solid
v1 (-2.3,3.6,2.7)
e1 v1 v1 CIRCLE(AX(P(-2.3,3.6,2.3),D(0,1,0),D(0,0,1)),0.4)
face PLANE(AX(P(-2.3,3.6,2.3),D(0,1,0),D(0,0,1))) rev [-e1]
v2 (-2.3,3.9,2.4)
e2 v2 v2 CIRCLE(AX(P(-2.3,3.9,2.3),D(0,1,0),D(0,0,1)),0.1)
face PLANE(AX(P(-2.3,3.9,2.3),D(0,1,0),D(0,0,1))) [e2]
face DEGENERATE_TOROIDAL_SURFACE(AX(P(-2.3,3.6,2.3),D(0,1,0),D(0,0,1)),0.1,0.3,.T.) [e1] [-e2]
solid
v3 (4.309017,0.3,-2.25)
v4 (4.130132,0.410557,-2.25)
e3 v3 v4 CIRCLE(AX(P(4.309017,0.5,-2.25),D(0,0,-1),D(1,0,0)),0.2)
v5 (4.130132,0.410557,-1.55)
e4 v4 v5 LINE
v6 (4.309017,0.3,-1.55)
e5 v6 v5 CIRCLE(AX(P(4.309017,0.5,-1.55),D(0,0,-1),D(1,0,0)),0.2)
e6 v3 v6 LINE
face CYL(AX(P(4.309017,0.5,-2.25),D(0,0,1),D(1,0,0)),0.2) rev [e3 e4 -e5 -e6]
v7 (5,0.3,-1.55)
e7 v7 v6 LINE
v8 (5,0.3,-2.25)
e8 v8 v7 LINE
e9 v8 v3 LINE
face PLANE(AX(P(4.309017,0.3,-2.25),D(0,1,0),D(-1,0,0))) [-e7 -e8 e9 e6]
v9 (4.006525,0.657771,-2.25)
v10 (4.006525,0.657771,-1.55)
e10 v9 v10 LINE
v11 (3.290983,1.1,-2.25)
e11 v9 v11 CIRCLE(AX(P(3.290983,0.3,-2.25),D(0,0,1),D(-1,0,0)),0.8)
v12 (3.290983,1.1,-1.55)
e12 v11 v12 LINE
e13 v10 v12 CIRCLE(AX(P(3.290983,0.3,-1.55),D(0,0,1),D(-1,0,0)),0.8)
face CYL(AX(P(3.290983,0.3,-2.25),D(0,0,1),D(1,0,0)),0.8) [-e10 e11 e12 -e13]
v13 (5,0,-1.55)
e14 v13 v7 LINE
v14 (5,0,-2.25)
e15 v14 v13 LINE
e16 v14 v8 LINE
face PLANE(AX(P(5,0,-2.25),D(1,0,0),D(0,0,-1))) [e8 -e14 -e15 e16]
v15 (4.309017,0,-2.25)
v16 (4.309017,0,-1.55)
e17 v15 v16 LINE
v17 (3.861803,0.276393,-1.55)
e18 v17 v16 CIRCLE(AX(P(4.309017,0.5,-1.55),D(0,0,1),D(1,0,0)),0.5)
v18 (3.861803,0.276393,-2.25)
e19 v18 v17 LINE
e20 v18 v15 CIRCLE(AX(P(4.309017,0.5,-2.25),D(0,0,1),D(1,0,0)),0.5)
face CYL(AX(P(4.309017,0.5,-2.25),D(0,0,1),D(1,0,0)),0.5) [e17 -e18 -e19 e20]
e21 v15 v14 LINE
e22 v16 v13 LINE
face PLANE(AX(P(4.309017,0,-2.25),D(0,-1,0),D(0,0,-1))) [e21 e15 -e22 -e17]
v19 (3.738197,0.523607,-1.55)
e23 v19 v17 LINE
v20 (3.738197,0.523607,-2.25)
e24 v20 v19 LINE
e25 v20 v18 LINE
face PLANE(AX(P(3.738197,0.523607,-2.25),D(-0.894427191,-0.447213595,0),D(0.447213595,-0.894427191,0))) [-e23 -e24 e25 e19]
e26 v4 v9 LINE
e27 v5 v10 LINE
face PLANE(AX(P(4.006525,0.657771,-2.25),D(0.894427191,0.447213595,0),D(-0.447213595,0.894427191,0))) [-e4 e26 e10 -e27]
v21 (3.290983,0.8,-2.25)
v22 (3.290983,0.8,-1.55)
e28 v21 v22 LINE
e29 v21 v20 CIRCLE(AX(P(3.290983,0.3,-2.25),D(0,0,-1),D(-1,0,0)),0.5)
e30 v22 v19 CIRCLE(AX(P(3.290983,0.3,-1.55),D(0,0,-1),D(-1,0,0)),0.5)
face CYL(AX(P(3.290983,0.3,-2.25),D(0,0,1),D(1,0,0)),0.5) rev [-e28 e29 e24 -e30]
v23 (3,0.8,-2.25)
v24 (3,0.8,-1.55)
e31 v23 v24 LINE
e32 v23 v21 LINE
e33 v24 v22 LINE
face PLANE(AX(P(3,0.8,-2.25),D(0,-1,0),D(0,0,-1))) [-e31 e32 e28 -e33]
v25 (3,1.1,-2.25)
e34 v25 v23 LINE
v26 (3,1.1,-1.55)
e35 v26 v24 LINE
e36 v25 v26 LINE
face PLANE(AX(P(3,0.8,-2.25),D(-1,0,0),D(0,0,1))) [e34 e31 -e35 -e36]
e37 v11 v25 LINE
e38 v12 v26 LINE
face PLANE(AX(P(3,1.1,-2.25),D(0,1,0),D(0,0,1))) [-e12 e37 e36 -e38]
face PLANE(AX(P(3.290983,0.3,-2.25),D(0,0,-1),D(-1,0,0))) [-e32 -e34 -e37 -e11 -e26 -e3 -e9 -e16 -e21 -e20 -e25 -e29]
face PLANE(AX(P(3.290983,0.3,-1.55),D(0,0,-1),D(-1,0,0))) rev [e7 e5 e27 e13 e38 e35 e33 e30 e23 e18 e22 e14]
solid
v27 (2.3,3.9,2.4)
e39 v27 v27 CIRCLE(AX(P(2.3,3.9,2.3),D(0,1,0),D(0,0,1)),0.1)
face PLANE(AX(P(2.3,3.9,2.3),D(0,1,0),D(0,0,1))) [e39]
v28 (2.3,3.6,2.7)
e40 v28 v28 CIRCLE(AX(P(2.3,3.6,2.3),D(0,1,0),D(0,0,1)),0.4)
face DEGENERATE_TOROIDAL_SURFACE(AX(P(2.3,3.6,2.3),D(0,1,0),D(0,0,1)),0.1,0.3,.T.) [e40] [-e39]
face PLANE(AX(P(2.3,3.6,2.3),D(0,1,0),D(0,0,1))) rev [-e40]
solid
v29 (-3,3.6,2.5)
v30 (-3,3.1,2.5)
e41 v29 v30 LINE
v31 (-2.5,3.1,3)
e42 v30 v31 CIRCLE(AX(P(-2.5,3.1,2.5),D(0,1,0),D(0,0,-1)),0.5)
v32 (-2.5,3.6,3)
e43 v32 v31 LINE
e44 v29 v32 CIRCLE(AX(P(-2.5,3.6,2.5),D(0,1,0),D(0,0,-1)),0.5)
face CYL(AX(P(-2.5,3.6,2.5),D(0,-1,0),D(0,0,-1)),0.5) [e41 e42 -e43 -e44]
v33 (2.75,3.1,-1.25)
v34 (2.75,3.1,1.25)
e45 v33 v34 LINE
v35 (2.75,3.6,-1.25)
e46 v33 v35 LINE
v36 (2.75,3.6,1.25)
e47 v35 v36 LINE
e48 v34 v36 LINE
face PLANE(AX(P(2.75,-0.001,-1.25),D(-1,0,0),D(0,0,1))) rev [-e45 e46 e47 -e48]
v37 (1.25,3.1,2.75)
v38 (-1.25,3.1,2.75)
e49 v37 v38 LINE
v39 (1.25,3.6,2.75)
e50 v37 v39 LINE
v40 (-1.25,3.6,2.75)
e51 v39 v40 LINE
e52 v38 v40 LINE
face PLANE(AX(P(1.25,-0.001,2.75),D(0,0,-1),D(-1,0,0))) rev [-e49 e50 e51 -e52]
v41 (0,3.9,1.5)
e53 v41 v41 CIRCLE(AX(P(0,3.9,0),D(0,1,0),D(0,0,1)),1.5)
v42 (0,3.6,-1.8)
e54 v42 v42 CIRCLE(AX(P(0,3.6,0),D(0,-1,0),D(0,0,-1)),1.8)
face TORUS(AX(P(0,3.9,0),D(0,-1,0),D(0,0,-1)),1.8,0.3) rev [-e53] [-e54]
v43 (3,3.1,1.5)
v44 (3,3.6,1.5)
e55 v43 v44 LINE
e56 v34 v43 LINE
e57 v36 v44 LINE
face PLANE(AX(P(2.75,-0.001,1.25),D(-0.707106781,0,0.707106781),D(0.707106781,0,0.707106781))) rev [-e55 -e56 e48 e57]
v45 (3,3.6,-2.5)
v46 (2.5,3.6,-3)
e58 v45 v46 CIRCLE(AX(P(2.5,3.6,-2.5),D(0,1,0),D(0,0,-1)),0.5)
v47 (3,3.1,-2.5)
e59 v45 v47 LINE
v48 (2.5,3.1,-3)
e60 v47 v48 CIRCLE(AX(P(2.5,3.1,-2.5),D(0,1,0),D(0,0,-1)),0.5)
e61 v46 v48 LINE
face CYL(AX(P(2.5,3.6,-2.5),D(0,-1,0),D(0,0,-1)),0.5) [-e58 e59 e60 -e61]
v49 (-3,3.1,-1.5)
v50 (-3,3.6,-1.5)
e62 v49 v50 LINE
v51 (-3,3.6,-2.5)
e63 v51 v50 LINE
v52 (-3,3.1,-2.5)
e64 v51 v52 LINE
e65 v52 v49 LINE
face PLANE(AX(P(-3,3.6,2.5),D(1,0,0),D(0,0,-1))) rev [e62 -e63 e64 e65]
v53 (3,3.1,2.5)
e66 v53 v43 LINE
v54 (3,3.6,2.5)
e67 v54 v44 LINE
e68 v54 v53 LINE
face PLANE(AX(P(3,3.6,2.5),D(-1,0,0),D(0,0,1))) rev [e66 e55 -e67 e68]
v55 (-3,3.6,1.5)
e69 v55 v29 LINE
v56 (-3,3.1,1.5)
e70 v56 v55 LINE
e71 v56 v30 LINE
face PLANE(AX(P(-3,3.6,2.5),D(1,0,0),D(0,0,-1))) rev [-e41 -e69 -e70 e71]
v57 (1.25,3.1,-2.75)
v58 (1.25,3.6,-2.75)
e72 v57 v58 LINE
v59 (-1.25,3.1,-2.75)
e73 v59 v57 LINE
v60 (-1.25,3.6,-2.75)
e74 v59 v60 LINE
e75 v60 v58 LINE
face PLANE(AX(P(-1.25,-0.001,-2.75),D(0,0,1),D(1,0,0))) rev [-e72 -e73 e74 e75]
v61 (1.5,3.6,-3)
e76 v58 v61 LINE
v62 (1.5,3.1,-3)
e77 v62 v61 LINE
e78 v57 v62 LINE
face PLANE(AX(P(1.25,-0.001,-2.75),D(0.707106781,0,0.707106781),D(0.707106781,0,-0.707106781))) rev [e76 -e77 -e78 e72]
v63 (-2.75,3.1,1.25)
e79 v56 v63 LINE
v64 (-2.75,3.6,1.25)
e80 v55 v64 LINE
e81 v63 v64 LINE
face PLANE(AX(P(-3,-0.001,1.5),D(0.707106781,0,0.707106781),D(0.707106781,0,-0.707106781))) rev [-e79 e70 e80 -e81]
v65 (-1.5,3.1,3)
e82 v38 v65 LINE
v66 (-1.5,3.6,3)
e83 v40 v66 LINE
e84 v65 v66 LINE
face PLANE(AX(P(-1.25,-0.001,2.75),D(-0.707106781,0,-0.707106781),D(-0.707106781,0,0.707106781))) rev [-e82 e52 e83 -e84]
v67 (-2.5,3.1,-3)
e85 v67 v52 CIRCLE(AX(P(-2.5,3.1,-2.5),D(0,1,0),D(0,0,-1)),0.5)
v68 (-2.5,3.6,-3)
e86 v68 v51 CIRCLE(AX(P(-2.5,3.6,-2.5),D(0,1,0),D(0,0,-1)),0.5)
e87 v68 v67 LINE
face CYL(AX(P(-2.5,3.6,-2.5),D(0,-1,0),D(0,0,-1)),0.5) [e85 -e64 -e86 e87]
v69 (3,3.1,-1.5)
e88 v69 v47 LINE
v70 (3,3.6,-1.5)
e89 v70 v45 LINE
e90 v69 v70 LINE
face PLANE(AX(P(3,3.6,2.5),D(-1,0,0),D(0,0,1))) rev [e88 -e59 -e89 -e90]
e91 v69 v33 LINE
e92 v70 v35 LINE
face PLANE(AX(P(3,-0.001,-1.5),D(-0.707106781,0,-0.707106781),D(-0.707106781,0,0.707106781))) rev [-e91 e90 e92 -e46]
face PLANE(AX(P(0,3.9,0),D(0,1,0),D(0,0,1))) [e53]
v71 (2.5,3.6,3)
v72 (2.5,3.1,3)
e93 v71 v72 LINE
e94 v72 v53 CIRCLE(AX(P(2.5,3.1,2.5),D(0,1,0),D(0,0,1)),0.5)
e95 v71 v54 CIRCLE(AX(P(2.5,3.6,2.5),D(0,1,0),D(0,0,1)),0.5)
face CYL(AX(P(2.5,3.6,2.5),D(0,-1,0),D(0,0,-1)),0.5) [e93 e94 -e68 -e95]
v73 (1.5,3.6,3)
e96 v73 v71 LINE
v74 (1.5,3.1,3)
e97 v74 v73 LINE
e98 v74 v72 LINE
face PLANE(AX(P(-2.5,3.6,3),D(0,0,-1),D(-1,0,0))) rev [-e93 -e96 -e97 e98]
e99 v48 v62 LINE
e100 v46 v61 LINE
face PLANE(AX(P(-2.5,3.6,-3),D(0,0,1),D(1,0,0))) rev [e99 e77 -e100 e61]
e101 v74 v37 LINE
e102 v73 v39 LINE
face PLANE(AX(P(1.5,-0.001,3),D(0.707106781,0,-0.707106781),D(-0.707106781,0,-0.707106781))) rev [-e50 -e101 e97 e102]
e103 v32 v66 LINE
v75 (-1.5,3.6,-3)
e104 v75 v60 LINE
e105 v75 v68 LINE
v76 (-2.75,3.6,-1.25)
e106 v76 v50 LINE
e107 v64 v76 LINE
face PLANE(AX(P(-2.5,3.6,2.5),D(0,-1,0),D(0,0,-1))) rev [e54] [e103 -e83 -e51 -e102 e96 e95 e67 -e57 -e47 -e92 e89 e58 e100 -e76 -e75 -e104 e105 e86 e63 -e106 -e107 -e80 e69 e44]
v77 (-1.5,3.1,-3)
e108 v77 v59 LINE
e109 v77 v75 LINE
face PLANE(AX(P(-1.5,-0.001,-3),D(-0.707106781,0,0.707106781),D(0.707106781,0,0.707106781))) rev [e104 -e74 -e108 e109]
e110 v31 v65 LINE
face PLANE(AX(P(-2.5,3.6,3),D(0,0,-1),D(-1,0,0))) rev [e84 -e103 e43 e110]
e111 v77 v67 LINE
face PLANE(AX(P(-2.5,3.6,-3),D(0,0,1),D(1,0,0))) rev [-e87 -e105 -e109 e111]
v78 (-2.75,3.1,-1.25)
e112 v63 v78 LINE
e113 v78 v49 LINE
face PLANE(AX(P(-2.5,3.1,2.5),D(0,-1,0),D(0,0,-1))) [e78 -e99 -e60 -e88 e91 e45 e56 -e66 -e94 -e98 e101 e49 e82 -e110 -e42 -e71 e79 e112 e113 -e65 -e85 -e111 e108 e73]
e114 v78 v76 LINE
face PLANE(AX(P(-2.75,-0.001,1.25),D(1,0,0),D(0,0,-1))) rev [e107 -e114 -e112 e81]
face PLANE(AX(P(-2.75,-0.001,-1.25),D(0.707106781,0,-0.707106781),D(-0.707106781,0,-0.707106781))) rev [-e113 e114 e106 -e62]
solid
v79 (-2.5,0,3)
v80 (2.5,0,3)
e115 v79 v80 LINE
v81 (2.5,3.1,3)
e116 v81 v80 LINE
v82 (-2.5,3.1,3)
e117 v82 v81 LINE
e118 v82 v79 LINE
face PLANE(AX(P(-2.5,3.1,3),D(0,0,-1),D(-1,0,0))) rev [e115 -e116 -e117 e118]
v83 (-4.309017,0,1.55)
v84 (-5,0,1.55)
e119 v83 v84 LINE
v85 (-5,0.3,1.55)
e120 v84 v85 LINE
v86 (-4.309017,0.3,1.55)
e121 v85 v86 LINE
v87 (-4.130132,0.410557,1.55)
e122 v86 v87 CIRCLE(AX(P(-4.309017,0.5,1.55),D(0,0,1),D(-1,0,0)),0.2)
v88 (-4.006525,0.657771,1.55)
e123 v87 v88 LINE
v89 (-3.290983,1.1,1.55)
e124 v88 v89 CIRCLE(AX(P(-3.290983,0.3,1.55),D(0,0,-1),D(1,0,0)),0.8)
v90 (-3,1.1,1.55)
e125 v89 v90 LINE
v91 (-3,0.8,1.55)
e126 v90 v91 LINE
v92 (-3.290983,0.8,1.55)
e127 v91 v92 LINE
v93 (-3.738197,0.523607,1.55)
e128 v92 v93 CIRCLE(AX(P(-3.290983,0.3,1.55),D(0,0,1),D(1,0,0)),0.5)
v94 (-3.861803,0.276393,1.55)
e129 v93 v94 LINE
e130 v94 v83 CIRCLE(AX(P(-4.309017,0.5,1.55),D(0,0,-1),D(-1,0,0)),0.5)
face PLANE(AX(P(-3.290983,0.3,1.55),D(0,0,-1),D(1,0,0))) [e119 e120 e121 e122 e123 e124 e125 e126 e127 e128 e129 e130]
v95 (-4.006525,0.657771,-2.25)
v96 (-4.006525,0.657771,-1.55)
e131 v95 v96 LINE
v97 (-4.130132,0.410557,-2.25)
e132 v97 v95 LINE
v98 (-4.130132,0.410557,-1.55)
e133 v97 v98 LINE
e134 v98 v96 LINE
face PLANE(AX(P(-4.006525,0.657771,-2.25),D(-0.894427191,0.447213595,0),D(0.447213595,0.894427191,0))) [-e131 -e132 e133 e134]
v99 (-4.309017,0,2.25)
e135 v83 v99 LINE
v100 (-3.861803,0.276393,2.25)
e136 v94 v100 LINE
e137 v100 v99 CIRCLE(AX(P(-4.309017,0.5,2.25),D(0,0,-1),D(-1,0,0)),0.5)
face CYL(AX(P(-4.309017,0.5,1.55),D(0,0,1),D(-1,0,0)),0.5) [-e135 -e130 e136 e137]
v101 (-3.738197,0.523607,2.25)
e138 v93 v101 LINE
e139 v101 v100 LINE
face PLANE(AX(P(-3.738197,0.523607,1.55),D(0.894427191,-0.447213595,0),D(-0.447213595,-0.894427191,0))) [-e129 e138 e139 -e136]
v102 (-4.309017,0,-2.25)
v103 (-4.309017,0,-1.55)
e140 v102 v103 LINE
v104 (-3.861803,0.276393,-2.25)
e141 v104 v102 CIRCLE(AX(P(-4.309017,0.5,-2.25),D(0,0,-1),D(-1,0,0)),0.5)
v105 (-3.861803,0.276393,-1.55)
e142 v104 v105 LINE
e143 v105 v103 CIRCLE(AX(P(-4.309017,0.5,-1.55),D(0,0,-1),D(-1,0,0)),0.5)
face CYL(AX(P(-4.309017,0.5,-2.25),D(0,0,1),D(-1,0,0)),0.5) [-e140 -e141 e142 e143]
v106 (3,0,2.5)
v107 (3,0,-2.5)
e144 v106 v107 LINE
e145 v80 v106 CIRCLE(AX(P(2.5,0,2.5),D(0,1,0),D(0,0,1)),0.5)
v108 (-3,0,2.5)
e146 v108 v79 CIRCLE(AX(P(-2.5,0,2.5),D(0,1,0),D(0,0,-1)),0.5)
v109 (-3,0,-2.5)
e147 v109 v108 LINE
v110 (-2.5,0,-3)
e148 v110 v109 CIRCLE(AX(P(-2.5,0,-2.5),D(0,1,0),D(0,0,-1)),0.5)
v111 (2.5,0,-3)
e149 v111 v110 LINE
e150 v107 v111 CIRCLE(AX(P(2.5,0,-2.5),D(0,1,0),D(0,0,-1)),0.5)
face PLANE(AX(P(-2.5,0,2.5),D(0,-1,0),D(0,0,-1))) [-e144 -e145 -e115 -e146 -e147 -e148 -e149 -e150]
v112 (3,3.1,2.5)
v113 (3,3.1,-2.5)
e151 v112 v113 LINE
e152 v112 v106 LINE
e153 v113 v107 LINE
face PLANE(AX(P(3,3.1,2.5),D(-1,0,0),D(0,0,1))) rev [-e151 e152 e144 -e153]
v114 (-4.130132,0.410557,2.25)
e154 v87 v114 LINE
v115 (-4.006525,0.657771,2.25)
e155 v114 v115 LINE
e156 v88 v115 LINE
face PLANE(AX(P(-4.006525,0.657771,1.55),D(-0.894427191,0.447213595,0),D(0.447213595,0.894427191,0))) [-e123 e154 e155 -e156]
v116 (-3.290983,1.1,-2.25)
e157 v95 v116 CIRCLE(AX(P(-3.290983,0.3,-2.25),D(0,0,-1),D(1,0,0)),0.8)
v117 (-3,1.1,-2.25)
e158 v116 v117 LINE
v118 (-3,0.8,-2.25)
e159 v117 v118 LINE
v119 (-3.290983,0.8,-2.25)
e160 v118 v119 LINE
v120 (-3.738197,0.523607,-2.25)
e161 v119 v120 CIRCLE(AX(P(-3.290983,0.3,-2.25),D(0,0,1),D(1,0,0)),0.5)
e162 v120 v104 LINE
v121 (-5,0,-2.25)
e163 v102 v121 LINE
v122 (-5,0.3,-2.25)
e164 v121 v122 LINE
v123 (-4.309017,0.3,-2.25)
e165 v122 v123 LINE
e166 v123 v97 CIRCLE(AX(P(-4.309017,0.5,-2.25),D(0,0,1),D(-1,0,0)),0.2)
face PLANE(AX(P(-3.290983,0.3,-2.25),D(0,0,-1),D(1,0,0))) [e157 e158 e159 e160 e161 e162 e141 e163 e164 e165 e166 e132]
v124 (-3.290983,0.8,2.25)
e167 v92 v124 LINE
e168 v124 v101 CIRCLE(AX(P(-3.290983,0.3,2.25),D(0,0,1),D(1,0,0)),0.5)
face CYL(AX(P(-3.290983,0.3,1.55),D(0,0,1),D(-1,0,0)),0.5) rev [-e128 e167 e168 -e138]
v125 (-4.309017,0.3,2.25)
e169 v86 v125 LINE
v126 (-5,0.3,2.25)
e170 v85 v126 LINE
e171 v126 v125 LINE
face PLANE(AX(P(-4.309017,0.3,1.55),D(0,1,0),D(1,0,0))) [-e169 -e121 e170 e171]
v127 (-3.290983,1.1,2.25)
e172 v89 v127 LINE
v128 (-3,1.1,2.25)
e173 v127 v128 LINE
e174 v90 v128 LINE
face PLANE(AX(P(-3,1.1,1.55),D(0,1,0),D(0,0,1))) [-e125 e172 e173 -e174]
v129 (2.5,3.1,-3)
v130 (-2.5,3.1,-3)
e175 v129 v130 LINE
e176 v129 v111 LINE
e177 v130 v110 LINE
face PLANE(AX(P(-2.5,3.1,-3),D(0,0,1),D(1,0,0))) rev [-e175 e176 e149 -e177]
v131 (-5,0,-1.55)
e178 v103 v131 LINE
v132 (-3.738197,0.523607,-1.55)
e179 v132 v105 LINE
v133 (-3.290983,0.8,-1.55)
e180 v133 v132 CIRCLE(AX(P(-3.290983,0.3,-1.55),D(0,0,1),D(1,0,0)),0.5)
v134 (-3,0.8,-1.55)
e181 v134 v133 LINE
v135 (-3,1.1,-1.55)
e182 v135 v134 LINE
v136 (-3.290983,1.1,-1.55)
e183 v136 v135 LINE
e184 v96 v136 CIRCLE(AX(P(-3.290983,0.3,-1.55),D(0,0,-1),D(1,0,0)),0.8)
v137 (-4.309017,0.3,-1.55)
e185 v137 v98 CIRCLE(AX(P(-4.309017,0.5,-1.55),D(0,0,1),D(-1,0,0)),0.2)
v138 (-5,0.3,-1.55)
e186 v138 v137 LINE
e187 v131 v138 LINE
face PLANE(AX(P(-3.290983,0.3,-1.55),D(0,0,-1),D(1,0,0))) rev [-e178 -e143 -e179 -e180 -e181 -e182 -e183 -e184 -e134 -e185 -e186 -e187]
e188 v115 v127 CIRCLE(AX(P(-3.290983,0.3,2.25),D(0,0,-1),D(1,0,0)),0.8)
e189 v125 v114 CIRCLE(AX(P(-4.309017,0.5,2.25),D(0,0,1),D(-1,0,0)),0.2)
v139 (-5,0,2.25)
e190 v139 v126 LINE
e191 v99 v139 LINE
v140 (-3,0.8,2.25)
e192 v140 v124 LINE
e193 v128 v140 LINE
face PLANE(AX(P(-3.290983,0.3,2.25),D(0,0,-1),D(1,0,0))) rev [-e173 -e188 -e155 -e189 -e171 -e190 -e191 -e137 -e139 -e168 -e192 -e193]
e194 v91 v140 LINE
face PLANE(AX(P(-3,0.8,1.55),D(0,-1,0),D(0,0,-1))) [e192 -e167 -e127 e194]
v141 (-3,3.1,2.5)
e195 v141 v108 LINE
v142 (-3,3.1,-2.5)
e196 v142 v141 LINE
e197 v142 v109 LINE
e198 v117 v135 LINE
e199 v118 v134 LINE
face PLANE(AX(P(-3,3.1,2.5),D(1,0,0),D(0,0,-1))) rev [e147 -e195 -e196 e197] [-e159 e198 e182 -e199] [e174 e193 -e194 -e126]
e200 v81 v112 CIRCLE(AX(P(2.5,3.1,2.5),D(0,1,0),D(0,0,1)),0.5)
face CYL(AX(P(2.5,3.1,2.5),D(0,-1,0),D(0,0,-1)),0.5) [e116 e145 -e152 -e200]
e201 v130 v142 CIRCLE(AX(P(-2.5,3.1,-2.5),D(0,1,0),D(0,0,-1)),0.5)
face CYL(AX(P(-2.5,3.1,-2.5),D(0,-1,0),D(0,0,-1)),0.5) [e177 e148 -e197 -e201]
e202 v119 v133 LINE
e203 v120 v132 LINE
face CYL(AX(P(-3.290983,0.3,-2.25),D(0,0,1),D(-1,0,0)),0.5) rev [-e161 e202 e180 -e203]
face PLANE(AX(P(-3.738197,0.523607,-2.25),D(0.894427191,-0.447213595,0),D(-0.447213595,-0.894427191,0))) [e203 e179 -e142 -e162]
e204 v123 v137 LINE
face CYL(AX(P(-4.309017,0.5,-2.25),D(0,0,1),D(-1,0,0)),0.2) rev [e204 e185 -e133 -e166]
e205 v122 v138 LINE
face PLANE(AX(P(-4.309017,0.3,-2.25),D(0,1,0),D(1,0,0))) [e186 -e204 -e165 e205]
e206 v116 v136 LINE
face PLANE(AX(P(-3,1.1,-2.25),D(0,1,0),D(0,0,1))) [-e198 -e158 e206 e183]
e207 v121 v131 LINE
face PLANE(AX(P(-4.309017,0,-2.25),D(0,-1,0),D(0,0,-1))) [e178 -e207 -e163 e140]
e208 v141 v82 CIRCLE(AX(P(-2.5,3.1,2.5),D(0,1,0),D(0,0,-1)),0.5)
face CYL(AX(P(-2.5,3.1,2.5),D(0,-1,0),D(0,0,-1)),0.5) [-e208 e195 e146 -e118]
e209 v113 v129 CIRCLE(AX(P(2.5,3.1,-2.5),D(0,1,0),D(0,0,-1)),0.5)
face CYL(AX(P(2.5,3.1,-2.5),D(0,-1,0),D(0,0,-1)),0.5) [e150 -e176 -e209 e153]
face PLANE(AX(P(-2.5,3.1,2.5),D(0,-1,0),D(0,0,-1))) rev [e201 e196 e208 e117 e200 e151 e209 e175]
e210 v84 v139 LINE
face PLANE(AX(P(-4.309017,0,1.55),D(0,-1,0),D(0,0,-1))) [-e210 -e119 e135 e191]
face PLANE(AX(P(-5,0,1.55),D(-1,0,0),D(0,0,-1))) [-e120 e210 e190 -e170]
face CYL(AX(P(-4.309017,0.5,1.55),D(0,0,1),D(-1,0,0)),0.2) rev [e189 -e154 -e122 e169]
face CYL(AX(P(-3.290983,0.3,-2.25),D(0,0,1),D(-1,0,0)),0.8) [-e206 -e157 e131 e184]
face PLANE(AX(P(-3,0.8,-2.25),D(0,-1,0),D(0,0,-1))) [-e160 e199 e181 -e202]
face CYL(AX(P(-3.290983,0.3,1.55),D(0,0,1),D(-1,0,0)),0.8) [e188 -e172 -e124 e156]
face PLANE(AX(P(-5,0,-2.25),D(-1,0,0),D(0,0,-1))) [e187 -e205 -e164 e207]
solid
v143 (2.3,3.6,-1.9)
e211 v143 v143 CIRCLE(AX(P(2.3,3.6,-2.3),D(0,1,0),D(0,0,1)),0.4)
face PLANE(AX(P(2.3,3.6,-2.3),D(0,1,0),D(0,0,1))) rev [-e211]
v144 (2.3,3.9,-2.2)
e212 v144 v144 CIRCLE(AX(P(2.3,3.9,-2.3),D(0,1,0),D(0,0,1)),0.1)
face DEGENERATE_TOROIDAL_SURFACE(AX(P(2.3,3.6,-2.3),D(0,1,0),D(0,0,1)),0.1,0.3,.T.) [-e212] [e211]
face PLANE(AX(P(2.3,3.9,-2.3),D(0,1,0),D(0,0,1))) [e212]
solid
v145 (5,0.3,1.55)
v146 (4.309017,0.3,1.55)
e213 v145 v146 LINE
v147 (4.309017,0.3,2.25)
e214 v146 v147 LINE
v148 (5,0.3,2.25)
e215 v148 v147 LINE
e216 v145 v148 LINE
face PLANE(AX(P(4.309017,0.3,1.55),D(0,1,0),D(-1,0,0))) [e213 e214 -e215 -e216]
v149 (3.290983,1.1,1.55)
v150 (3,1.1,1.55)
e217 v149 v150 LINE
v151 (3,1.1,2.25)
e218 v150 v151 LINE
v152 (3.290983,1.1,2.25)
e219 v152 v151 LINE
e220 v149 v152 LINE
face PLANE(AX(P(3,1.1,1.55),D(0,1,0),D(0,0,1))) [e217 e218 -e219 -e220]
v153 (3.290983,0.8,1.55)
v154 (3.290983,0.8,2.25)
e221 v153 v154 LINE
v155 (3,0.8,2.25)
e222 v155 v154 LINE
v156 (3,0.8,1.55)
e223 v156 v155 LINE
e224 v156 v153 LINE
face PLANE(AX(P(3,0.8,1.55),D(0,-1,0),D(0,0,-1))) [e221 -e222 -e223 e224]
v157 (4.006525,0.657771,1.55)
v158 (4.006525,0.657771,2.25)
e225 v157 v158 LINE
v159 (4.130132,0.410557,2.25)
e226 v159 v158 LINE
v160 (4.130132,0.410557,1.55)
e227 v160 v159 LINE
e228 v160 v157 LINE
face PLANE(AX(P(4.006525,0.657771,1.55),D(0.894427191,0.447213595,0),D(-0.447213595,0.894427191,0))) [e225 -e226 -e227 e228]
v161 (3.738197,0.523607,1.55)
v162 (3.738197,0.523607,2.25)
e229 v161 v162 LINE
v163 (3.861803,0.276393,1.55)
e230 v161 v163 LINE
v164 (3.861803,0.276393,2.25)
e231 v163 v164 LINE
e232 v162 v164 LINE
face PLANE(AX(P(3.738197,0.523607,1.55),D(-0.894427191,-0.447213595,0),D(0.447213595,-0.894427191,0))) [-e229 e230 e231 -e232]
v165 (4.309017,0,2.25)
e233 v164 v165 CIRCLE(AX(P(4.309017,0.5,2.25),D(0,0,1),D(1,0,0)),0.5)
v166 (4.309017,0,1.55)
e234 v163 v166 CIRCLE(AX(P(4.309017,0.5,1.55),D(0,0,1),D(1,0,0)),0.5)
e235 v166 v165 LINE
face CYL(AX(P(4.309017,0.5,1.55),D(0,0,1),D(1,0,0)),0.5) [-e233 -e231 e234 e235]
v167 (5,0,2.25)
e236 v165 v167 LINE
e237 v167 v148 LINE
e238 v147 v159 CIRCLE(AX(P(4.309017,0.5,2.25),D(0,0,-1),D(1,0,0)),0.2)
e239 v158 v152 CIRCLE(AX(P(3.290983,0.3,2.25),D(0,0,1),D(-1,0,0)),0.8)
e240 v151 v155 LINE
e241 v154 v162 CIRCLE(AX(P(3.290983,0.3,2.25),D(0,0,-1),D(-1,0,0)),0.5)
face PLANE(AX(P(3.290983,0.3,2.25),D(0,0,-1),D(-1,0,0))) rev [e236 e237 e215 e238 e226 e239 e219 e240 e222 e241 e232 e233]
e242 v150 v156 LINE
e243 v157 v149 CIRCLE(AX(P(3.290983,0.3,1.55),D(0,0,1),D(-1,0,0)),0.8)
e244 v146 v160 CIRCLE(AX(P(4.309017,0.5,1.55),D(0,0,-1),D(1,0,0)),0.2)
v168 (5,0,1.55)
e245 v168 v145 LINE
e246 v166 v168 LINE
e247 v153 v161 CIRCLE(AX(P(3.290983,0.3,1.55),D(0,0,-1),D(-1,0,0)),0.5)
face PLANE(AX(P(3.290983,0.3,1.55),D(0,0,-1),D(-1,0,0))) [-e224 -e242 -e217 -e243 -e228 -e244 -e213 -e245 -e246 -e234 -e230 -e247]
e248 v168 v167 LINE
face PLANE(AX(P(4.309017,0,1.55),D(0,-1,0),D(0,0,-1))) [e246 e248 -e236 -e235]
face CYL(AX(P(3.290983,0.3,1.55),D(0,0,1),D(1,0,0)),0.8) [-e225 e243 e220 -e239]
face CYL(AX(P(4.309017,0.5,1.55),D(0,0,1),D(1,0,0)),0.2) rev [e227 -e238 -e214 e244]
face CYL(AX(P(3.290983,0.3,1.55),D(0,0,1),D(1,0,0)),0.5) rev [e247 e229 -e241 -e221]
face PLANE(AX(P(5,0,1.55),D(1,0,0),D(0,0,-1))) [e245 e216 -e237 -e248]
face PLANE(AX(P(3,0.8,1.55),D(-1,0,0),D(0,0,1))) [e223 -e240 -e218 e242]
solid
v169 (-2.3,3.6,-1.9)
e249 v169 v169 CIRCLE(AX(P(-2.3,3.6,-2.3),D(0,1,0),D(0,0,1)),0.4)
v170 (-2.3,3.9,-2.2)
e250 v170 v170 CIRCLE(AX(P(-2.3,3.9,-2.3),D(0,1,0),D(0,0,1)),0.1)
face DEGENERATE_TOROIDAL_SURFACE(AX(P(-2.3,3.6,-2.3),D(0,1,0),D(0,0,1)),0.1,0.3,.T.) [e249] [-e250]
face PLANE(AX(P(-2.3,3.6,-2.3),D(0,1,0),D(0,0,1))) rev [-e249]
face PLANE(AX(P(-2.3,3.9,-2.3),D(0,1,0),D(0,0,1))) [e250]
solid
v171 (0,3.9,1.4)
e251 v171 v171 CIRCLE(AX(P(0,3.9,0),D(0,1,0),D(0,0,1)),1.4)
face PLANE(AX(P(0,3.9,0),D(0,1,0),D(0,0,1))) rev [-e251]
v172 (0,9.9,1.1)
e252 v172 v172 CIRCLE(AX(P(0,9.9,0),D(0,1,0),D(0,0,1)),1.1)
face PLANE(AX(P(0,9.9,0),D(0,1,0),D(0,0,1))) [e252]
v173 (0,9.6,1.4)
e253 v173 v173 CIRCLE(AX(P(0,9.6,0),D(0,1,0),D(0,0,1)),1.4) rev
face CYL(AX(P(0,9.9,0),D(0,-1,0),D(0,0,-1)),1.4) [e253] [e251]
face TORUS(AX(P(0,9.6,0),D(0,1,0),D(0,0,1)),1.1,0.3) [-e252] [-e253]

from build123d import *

# Parameters (mm, degrees)
BOSS_EXTRUDE1_DEPTH   = 3.1
BOSS_EXTRUDE2_DEPTH   = 0.5
SKETCH3_R             = 0.4
BOSS_EXTRUDE3_DEPTH   = 0.3
BOSS_EXTRUDE3_2_DEPTH = 0.3
BOSS_EXTRUDE3_3_DEPTH = 0.3
BOSS_EXTRUDE3_4_DEPTH = 0.3
FILLET1_R             = 0.3
FILLET2_R             = 0.3
FILLET3_R             = 0.3
FILLET4_R             = 0.3
SKETCH4_R             = 1.5
BOSS_EXTRUDE4_DEPTH   = 0.3
BOSS_EXTRUDE6_START   = 2.25
BOSS_EXTRUDE6_DEPTH   = 0.7
LPATTERN1_COUNT       = 2
LPATTERN1_PITCH       = 3.8
MIRROR5_START         = 2.25
MIRROR5_COPY_1_DEPTH  = 0.7
CUT_EXTRUDE1_DEPTH    = 0.5
FILLET8_R             = 0.3
SKETCH10_R            = 1.4
BOSS_EXTRUDE10_DEPTH  = 6
FILLET9_R             = 0.3


# Some blends are built 0.0001 mm under size
with BuildPart() as part:
    # Sketch1 → Boss-Extrude1 (new body)
    with BuildSketch(Plane(origin=(0, 0, 0), x_dir=(1, 0, 0), z_dir=(0, 1, 0))):
        with BuildLine():
            Line((-2.5, -3), (2.5, -3))
            ThreePointArc((2.5, -3), (2.853553391, -2.853553391), (3, -2.5))
            Line((3, -2.5), (3, 2.5))
            ThreePointArc((3, 2.5), (2.853553391, 2.853553391), (2.5, 3))
            Line((2.5, 3), (-2.5, 3))
            ThreePointArc((-2.5, 3), (-2.853553391, 2.853553391), (-3, 2.5))
            Line((-3, 2.5), (-3, -2.5))
            ThreePointArc((-3, -2.5), (-2.853553391, -2.853553391), (-2.5, -3))
        make_face()
    extrude(amount=BOSS_EXTRUDE1_DEPTH)


with BuildPart() as body_2:
    # Sketch2 → Boss-Extrude2 (new body)
    with BuildSketch(Plane(origin=(0, 3.1, 0), x_dir=(1, 0, 0), z_dir=(0, 1, 0))):
        with BuildLine():
            Line((-2.5, -3), (2.5, -3))
            ThreePointArc((2.5, -3), (2.853553391, -2.853553391), (3, -2.5))
            Line((3, -2.5), (3, 2.5))
            ThreePointArc((3, 2.5), (2.853553391, 2.853553391), (2.5, 3))
            Line((2.5, 3), (-2.5, 3))
            ThreePointArc((-2.5, 3), (-2.853553391, 2.853553391), (-3, 2.5))
            Line((-3, 2.5), (-3, -2.5))
            ThreePointArc((-3, -2.5), (-2.853553391, -2.853553391), (-2.5, -3))
        make_face()
    extrude(amount=BOSS_EXTRUDE2_DEPTH)

    # Sketch4 → Boss-Extrude4 (add)
    with BuildSketch(Plane(origin=(0, 3.6, 0), x_dir=(1, 0, 0), z_dir=(0, 1, 0))):
        with Locations(Location((0, 0, 0), (0, 0, 270))):
            Circle(SKETCH4_R)
    extrude(amount=BOSS_EXTRUDE4_DEPTH)

    # Sketch7 → Cut-Extrude1 (cut)
    with BuildSketch(Plane(origin=(0, 3.6, 0), x_dir=(1, 0, 0), z_dir=(0, 1, 0))):
        Polygon((-1.5, 3), (-1.25, 2.75), (1.25, 2.75), (1.5, 3), align=None)
        Polygon((3, -1.5), (3, 1.5), (2.75, 1.25), (2.75, -1.25), align=None)
        Polygon((-1.5, -3), (1.5, -3), (1.25, -2.75), (-1.25, -2.75), align=None)
        Polygon((-3, 1.5), (-3, -1.5), (-2.75, -1.25), (-2.75, 1.25), align=None)
    extrude(amount=-CUT_EXTRUDE1_DEPTH, mode=Mode.SUBTRACT)

    # Fillet8
    fillet8_edges = [body_2.edges().sort_by_distance(p)[0] for p in [
        (0, 3.6, -1.5),
    ]]
    fillet(fillet8_edges, radius=FILLET8_R - 0.0001)  # a hair under: the kernel refuses the full size


with BuildPart() as body_3:
    # Sketch3 → Boss-Extrude3 (new body)
    with BuildSketch(Plane(origin=(0, 3.6, 0), x_dir=(1, 0, 0), z_dir=(0, 1, 0))):
        with Locations(Location((-2.3, 2.3, 0), (0, 0, 270))):
            Circle(SKETCH3_R)
    extrude(amount=BOSS_EXTRUDE3_DEPTH)

    # Fillet2
    # the kernel refuses this fillet: 0.3 mm, written as the material it takes off along each edge
    with BuildSketch(Plane(origin=(-2.3, 3.9, -2.3), x_dir=(0, 0, 1), z_dir=(-1, 0, 0))) as fillet2_piece_1:
        with BuildLine():
            CenterArc((0.4 - FILLET2_R, -FILLET2_R), FILLET2_R, 0, 90)
            Line((0.4 - FILLET2_R, 0), (0.4, 0))
            Line((0.4, 0), (0.4, -FILLET2_R))
        make_face()
    revolve(axis=Axis((-2.3, 3.9, -2.3), (0, 1, 0)), mode=Mode.SUBTRACT)


with BuildPart() as body_4:
    # Sketch3 → Boss-Extrude3 2 (new body)
    with BuildSketch(Plane(origin=(0, 3.6, 0), x_dir=(1, 0, 0), z_dir=(0, 1, 0))):
        with Locations(Location((2.3, 2.3, 0), (0, 0, 270))):
            Circle(SKETCH3_R)
    extrude(amount=BOSS_EXTRUDE3_2_DEPTH)

    # Fillet3
    # the kernel refuses this fillet: 0.3 mm, written as the material it takes off along each edge
    with BuildSketch(Plane(origin=(2.3, 3.9, -2.3), x_dir=(0, 0, 1), z_dir=(-1, 0, 0))) as fillet3_piece_1:
        with BuildLine():
            CenterArc((0.4 - FILLET3_R, -FILLET3_R), FILLET3_R, 0, 90)
            Line((0.4 - FILLET3_R, 0), (0.4, 0))
            Line((0.4, 0), (0.4, -FILLET3_R))
        make_face()
    revolve(axis=Axis((2.3, 3.9, -2.3), (0, 1, 0)), mode=Mode.SUBTRACT)


with BuildPart() as body_5:
    # Sketch3 → Boss-Extrude3 3 (new body)
    with BuildSketch(Plane(origin=(0, 3.6, 0), x_dir=(1, 0, 0), z_dir=(0, 1, 0))):
        with Locations(Location((2.3, -2.3, 0), (0, 0, 270))):
            Circle(SKETCH3_R)
    extrude(amount=BOSS_EXTRUDE3_3_DEPTH)

    # Fillet4
    # the kernel refuses this fillet: 0.3 mm, written as the material it takes off along each edge
    with BuildSketch(Plane(origin=(2.3, 3.9, 2.3), x_dir=(0, 0, 1), z_dir=(-1, 0, 0))) as fillet4_piece_1:
        with BuildLine():
            CenterArc((0.4 - FILLET4_R, -FILLET4_R), FILLET4_R, 0, 90)
            Line((0.4 - FILLET4_R, 0), (0.4, 0))
            Line((0.4, 0), (0.4, -FILLET4_R))
        make_face()
    revolve(axis=Axis((2.3, 3.9, 2.3), (0, 1, 0)), mode=Mode.SUBTRACT)


with BuildPart() as body_6:
    # Sketch3 → Boss-Extrude3 4 (new body)
    with BuildSketch(Plane(origin=(0, 3.6, 0), x_dir=(1, 0, 0), z_dir=(0, 1, 0))):
        with Locations(Location((-2.3, -2.3, 0), (0, 0, 270))):
            Circle(SKETCH3_R)
    extrude(amount=BOSS_EXTRUDE3_4_DEPTH)

    # Fillet1
    # the kernel refuses this fillet: 0.3 mm, written as the material it takes off along each edge
    with BuildSketch(Plane(origin=(-2.3, 3.9, 2.3), x_dir=(0, 0, 1), z_dir=(-1, 0, 0))) as fillet1_piece_1:
        with BuildLine():
            CenterArc((0.4 - FILLET1_R, -FILLET1_R), FILLET1_R, 0, 90)
            Line((0.4 - FILLET1_R, 0), (0.4, 0))
            Line((0.4, 0), (0.4, -FILLET1_R))
        make_face()
    revolve(axis=Axis((-2.3, 3.9, 2.3), (0, 1, 0)), mode=Mode.SUBTRACT)


with BuildPart() as body_7:
    # Sketch6 → Boss-Extrude6 (new body)
    with BuildSketch(Plane.XY.offset(BOSS_EXTRUDE6_START)):
        with BuildLine():
            Line((3, 0.8), (3.290983006, 0.8))
            ThreePointArc((3.290983006, 0.8), (3.553848562, 0.725325404), (3.738196601, 0.523606798))
            Line((3.738196601, 0.523606798), (3.861803399, 0.276393202))
            ThreePointArc((3.861803399, 0.276393202), (4.046151438, 0.074674596), (4.309016994, 0))
            Line((4.309016994, 0), (5, 0))
            Line((5, 0), (5, 0.3))
            Line((5, 0.3), (4.309016994, 0.3))
            ThreePointArc((4.309016994, 0.3), (4.203870772, 0.329869838), (4.130131556, 0.410557281))
            Line((4.130131556, 0.410557281), (4.006524758, 0.657770876))
            ThreePointArc((4.006524758, 0.657770876), (3.711567895, 0.980520647), (3.290983006, 1.1))
            Line((3.290983006, 1.1), (3, 1.1))
            Line((3, 1.1), (3, 0.8))
        make_face()
    boss_extrude6 = extrude(amount=-BOSS_EXTRUDE6_DEPTH)


with BuildPart() as lpattern1_1:
    # LPattern1: Boss-Extrude6 ×2
    with Locations(*[(0, 0, -i * LPATTERN1_PITCH) for i in range(1, LPATTERN1_COUNT)]):
        add(boss_extrude6)


with BuildPart() as part_1:
    add(part.part)

    # Mirror5: Boss-Extrude6 across plane
    add(boss_extrude6.mirror(Plane(origin=(0, 0, 0), x_dir=(0, 0, 1), z_dir=(1, 0, 0))))

    # Mirror5 copy 1 sketch → Mirror5 copy 1 (add)
    with BuildSketch(Plane(origin=(0, 0, -3.8), x_dir=(-1, 0, 0), z_dir=(0, 0, 1)).offset(MIRROR5_START)):
        with BuildLine():
            Line((3, -0.8), (3.290983006, -0.8))
            ThreePointArc((3.290983006, -0.8), (3.553848562, -0.725325404), (3.738196601, -0.523606798))
            Line((3.738196601, -0.523606798), (3.861803399, -0.276393202))
            ThreePointArc((3.861803399, -0.276393202), (4.046151438, -0.074674596), (4.309016994, 0))
            Line((4.309016994, 0), (5, 0))
            Line((5, 0), (5, -0.3))
            Line((5, -0.3), (4.309016994, -0.3))
            ThreePointArc((4.309016994, -0.3), (4.203870772, -0.329869838), (4.130131556, -0.410557281))
            Line((4.130131556, -0.410557281), (4.006524758, -0.657770876))
            ThreePointArc((4.006524758, -0.657770876), (3.711567895, -0.980520647), (3.290983006, -1.1))
            Line((3.290983006, -1.1), (3, -1.1))
            Line((3, -1.1), (3, -0.8))
        make_face()
    extrude(amount=-MIRROR5_COPY_1_DEPTH)


with BuildPart() as body_9:
    # Sketch10 → Boss-Extrude10 (new body)
    with BuildSketch(Plane(origin=(0, 3.9, 0), x_dir=(1, 0, 0), z_dir=(0, 1, 0))):
        with Locations(Location((0, 0, 0), (0, 0, 270))):
            Circle(SKETCH10_R)
    extrude(amount=BOSS_EXTRUDE10_DEPTH)

    # Fillet9
    fillet9_edges = [body_9.edges().sort_by_distance(p)[0] for p in [
        (0, 9.9, -1.4),
    ]]
    fillet(fillet9_edges, radius=FILLET9_R)


solid = Compound([body_2.part, body_3.part, body_4.part, body_5.part, body_6.part, body_7.part, lpattern1_1.part, part_1.part, body_9.part])
